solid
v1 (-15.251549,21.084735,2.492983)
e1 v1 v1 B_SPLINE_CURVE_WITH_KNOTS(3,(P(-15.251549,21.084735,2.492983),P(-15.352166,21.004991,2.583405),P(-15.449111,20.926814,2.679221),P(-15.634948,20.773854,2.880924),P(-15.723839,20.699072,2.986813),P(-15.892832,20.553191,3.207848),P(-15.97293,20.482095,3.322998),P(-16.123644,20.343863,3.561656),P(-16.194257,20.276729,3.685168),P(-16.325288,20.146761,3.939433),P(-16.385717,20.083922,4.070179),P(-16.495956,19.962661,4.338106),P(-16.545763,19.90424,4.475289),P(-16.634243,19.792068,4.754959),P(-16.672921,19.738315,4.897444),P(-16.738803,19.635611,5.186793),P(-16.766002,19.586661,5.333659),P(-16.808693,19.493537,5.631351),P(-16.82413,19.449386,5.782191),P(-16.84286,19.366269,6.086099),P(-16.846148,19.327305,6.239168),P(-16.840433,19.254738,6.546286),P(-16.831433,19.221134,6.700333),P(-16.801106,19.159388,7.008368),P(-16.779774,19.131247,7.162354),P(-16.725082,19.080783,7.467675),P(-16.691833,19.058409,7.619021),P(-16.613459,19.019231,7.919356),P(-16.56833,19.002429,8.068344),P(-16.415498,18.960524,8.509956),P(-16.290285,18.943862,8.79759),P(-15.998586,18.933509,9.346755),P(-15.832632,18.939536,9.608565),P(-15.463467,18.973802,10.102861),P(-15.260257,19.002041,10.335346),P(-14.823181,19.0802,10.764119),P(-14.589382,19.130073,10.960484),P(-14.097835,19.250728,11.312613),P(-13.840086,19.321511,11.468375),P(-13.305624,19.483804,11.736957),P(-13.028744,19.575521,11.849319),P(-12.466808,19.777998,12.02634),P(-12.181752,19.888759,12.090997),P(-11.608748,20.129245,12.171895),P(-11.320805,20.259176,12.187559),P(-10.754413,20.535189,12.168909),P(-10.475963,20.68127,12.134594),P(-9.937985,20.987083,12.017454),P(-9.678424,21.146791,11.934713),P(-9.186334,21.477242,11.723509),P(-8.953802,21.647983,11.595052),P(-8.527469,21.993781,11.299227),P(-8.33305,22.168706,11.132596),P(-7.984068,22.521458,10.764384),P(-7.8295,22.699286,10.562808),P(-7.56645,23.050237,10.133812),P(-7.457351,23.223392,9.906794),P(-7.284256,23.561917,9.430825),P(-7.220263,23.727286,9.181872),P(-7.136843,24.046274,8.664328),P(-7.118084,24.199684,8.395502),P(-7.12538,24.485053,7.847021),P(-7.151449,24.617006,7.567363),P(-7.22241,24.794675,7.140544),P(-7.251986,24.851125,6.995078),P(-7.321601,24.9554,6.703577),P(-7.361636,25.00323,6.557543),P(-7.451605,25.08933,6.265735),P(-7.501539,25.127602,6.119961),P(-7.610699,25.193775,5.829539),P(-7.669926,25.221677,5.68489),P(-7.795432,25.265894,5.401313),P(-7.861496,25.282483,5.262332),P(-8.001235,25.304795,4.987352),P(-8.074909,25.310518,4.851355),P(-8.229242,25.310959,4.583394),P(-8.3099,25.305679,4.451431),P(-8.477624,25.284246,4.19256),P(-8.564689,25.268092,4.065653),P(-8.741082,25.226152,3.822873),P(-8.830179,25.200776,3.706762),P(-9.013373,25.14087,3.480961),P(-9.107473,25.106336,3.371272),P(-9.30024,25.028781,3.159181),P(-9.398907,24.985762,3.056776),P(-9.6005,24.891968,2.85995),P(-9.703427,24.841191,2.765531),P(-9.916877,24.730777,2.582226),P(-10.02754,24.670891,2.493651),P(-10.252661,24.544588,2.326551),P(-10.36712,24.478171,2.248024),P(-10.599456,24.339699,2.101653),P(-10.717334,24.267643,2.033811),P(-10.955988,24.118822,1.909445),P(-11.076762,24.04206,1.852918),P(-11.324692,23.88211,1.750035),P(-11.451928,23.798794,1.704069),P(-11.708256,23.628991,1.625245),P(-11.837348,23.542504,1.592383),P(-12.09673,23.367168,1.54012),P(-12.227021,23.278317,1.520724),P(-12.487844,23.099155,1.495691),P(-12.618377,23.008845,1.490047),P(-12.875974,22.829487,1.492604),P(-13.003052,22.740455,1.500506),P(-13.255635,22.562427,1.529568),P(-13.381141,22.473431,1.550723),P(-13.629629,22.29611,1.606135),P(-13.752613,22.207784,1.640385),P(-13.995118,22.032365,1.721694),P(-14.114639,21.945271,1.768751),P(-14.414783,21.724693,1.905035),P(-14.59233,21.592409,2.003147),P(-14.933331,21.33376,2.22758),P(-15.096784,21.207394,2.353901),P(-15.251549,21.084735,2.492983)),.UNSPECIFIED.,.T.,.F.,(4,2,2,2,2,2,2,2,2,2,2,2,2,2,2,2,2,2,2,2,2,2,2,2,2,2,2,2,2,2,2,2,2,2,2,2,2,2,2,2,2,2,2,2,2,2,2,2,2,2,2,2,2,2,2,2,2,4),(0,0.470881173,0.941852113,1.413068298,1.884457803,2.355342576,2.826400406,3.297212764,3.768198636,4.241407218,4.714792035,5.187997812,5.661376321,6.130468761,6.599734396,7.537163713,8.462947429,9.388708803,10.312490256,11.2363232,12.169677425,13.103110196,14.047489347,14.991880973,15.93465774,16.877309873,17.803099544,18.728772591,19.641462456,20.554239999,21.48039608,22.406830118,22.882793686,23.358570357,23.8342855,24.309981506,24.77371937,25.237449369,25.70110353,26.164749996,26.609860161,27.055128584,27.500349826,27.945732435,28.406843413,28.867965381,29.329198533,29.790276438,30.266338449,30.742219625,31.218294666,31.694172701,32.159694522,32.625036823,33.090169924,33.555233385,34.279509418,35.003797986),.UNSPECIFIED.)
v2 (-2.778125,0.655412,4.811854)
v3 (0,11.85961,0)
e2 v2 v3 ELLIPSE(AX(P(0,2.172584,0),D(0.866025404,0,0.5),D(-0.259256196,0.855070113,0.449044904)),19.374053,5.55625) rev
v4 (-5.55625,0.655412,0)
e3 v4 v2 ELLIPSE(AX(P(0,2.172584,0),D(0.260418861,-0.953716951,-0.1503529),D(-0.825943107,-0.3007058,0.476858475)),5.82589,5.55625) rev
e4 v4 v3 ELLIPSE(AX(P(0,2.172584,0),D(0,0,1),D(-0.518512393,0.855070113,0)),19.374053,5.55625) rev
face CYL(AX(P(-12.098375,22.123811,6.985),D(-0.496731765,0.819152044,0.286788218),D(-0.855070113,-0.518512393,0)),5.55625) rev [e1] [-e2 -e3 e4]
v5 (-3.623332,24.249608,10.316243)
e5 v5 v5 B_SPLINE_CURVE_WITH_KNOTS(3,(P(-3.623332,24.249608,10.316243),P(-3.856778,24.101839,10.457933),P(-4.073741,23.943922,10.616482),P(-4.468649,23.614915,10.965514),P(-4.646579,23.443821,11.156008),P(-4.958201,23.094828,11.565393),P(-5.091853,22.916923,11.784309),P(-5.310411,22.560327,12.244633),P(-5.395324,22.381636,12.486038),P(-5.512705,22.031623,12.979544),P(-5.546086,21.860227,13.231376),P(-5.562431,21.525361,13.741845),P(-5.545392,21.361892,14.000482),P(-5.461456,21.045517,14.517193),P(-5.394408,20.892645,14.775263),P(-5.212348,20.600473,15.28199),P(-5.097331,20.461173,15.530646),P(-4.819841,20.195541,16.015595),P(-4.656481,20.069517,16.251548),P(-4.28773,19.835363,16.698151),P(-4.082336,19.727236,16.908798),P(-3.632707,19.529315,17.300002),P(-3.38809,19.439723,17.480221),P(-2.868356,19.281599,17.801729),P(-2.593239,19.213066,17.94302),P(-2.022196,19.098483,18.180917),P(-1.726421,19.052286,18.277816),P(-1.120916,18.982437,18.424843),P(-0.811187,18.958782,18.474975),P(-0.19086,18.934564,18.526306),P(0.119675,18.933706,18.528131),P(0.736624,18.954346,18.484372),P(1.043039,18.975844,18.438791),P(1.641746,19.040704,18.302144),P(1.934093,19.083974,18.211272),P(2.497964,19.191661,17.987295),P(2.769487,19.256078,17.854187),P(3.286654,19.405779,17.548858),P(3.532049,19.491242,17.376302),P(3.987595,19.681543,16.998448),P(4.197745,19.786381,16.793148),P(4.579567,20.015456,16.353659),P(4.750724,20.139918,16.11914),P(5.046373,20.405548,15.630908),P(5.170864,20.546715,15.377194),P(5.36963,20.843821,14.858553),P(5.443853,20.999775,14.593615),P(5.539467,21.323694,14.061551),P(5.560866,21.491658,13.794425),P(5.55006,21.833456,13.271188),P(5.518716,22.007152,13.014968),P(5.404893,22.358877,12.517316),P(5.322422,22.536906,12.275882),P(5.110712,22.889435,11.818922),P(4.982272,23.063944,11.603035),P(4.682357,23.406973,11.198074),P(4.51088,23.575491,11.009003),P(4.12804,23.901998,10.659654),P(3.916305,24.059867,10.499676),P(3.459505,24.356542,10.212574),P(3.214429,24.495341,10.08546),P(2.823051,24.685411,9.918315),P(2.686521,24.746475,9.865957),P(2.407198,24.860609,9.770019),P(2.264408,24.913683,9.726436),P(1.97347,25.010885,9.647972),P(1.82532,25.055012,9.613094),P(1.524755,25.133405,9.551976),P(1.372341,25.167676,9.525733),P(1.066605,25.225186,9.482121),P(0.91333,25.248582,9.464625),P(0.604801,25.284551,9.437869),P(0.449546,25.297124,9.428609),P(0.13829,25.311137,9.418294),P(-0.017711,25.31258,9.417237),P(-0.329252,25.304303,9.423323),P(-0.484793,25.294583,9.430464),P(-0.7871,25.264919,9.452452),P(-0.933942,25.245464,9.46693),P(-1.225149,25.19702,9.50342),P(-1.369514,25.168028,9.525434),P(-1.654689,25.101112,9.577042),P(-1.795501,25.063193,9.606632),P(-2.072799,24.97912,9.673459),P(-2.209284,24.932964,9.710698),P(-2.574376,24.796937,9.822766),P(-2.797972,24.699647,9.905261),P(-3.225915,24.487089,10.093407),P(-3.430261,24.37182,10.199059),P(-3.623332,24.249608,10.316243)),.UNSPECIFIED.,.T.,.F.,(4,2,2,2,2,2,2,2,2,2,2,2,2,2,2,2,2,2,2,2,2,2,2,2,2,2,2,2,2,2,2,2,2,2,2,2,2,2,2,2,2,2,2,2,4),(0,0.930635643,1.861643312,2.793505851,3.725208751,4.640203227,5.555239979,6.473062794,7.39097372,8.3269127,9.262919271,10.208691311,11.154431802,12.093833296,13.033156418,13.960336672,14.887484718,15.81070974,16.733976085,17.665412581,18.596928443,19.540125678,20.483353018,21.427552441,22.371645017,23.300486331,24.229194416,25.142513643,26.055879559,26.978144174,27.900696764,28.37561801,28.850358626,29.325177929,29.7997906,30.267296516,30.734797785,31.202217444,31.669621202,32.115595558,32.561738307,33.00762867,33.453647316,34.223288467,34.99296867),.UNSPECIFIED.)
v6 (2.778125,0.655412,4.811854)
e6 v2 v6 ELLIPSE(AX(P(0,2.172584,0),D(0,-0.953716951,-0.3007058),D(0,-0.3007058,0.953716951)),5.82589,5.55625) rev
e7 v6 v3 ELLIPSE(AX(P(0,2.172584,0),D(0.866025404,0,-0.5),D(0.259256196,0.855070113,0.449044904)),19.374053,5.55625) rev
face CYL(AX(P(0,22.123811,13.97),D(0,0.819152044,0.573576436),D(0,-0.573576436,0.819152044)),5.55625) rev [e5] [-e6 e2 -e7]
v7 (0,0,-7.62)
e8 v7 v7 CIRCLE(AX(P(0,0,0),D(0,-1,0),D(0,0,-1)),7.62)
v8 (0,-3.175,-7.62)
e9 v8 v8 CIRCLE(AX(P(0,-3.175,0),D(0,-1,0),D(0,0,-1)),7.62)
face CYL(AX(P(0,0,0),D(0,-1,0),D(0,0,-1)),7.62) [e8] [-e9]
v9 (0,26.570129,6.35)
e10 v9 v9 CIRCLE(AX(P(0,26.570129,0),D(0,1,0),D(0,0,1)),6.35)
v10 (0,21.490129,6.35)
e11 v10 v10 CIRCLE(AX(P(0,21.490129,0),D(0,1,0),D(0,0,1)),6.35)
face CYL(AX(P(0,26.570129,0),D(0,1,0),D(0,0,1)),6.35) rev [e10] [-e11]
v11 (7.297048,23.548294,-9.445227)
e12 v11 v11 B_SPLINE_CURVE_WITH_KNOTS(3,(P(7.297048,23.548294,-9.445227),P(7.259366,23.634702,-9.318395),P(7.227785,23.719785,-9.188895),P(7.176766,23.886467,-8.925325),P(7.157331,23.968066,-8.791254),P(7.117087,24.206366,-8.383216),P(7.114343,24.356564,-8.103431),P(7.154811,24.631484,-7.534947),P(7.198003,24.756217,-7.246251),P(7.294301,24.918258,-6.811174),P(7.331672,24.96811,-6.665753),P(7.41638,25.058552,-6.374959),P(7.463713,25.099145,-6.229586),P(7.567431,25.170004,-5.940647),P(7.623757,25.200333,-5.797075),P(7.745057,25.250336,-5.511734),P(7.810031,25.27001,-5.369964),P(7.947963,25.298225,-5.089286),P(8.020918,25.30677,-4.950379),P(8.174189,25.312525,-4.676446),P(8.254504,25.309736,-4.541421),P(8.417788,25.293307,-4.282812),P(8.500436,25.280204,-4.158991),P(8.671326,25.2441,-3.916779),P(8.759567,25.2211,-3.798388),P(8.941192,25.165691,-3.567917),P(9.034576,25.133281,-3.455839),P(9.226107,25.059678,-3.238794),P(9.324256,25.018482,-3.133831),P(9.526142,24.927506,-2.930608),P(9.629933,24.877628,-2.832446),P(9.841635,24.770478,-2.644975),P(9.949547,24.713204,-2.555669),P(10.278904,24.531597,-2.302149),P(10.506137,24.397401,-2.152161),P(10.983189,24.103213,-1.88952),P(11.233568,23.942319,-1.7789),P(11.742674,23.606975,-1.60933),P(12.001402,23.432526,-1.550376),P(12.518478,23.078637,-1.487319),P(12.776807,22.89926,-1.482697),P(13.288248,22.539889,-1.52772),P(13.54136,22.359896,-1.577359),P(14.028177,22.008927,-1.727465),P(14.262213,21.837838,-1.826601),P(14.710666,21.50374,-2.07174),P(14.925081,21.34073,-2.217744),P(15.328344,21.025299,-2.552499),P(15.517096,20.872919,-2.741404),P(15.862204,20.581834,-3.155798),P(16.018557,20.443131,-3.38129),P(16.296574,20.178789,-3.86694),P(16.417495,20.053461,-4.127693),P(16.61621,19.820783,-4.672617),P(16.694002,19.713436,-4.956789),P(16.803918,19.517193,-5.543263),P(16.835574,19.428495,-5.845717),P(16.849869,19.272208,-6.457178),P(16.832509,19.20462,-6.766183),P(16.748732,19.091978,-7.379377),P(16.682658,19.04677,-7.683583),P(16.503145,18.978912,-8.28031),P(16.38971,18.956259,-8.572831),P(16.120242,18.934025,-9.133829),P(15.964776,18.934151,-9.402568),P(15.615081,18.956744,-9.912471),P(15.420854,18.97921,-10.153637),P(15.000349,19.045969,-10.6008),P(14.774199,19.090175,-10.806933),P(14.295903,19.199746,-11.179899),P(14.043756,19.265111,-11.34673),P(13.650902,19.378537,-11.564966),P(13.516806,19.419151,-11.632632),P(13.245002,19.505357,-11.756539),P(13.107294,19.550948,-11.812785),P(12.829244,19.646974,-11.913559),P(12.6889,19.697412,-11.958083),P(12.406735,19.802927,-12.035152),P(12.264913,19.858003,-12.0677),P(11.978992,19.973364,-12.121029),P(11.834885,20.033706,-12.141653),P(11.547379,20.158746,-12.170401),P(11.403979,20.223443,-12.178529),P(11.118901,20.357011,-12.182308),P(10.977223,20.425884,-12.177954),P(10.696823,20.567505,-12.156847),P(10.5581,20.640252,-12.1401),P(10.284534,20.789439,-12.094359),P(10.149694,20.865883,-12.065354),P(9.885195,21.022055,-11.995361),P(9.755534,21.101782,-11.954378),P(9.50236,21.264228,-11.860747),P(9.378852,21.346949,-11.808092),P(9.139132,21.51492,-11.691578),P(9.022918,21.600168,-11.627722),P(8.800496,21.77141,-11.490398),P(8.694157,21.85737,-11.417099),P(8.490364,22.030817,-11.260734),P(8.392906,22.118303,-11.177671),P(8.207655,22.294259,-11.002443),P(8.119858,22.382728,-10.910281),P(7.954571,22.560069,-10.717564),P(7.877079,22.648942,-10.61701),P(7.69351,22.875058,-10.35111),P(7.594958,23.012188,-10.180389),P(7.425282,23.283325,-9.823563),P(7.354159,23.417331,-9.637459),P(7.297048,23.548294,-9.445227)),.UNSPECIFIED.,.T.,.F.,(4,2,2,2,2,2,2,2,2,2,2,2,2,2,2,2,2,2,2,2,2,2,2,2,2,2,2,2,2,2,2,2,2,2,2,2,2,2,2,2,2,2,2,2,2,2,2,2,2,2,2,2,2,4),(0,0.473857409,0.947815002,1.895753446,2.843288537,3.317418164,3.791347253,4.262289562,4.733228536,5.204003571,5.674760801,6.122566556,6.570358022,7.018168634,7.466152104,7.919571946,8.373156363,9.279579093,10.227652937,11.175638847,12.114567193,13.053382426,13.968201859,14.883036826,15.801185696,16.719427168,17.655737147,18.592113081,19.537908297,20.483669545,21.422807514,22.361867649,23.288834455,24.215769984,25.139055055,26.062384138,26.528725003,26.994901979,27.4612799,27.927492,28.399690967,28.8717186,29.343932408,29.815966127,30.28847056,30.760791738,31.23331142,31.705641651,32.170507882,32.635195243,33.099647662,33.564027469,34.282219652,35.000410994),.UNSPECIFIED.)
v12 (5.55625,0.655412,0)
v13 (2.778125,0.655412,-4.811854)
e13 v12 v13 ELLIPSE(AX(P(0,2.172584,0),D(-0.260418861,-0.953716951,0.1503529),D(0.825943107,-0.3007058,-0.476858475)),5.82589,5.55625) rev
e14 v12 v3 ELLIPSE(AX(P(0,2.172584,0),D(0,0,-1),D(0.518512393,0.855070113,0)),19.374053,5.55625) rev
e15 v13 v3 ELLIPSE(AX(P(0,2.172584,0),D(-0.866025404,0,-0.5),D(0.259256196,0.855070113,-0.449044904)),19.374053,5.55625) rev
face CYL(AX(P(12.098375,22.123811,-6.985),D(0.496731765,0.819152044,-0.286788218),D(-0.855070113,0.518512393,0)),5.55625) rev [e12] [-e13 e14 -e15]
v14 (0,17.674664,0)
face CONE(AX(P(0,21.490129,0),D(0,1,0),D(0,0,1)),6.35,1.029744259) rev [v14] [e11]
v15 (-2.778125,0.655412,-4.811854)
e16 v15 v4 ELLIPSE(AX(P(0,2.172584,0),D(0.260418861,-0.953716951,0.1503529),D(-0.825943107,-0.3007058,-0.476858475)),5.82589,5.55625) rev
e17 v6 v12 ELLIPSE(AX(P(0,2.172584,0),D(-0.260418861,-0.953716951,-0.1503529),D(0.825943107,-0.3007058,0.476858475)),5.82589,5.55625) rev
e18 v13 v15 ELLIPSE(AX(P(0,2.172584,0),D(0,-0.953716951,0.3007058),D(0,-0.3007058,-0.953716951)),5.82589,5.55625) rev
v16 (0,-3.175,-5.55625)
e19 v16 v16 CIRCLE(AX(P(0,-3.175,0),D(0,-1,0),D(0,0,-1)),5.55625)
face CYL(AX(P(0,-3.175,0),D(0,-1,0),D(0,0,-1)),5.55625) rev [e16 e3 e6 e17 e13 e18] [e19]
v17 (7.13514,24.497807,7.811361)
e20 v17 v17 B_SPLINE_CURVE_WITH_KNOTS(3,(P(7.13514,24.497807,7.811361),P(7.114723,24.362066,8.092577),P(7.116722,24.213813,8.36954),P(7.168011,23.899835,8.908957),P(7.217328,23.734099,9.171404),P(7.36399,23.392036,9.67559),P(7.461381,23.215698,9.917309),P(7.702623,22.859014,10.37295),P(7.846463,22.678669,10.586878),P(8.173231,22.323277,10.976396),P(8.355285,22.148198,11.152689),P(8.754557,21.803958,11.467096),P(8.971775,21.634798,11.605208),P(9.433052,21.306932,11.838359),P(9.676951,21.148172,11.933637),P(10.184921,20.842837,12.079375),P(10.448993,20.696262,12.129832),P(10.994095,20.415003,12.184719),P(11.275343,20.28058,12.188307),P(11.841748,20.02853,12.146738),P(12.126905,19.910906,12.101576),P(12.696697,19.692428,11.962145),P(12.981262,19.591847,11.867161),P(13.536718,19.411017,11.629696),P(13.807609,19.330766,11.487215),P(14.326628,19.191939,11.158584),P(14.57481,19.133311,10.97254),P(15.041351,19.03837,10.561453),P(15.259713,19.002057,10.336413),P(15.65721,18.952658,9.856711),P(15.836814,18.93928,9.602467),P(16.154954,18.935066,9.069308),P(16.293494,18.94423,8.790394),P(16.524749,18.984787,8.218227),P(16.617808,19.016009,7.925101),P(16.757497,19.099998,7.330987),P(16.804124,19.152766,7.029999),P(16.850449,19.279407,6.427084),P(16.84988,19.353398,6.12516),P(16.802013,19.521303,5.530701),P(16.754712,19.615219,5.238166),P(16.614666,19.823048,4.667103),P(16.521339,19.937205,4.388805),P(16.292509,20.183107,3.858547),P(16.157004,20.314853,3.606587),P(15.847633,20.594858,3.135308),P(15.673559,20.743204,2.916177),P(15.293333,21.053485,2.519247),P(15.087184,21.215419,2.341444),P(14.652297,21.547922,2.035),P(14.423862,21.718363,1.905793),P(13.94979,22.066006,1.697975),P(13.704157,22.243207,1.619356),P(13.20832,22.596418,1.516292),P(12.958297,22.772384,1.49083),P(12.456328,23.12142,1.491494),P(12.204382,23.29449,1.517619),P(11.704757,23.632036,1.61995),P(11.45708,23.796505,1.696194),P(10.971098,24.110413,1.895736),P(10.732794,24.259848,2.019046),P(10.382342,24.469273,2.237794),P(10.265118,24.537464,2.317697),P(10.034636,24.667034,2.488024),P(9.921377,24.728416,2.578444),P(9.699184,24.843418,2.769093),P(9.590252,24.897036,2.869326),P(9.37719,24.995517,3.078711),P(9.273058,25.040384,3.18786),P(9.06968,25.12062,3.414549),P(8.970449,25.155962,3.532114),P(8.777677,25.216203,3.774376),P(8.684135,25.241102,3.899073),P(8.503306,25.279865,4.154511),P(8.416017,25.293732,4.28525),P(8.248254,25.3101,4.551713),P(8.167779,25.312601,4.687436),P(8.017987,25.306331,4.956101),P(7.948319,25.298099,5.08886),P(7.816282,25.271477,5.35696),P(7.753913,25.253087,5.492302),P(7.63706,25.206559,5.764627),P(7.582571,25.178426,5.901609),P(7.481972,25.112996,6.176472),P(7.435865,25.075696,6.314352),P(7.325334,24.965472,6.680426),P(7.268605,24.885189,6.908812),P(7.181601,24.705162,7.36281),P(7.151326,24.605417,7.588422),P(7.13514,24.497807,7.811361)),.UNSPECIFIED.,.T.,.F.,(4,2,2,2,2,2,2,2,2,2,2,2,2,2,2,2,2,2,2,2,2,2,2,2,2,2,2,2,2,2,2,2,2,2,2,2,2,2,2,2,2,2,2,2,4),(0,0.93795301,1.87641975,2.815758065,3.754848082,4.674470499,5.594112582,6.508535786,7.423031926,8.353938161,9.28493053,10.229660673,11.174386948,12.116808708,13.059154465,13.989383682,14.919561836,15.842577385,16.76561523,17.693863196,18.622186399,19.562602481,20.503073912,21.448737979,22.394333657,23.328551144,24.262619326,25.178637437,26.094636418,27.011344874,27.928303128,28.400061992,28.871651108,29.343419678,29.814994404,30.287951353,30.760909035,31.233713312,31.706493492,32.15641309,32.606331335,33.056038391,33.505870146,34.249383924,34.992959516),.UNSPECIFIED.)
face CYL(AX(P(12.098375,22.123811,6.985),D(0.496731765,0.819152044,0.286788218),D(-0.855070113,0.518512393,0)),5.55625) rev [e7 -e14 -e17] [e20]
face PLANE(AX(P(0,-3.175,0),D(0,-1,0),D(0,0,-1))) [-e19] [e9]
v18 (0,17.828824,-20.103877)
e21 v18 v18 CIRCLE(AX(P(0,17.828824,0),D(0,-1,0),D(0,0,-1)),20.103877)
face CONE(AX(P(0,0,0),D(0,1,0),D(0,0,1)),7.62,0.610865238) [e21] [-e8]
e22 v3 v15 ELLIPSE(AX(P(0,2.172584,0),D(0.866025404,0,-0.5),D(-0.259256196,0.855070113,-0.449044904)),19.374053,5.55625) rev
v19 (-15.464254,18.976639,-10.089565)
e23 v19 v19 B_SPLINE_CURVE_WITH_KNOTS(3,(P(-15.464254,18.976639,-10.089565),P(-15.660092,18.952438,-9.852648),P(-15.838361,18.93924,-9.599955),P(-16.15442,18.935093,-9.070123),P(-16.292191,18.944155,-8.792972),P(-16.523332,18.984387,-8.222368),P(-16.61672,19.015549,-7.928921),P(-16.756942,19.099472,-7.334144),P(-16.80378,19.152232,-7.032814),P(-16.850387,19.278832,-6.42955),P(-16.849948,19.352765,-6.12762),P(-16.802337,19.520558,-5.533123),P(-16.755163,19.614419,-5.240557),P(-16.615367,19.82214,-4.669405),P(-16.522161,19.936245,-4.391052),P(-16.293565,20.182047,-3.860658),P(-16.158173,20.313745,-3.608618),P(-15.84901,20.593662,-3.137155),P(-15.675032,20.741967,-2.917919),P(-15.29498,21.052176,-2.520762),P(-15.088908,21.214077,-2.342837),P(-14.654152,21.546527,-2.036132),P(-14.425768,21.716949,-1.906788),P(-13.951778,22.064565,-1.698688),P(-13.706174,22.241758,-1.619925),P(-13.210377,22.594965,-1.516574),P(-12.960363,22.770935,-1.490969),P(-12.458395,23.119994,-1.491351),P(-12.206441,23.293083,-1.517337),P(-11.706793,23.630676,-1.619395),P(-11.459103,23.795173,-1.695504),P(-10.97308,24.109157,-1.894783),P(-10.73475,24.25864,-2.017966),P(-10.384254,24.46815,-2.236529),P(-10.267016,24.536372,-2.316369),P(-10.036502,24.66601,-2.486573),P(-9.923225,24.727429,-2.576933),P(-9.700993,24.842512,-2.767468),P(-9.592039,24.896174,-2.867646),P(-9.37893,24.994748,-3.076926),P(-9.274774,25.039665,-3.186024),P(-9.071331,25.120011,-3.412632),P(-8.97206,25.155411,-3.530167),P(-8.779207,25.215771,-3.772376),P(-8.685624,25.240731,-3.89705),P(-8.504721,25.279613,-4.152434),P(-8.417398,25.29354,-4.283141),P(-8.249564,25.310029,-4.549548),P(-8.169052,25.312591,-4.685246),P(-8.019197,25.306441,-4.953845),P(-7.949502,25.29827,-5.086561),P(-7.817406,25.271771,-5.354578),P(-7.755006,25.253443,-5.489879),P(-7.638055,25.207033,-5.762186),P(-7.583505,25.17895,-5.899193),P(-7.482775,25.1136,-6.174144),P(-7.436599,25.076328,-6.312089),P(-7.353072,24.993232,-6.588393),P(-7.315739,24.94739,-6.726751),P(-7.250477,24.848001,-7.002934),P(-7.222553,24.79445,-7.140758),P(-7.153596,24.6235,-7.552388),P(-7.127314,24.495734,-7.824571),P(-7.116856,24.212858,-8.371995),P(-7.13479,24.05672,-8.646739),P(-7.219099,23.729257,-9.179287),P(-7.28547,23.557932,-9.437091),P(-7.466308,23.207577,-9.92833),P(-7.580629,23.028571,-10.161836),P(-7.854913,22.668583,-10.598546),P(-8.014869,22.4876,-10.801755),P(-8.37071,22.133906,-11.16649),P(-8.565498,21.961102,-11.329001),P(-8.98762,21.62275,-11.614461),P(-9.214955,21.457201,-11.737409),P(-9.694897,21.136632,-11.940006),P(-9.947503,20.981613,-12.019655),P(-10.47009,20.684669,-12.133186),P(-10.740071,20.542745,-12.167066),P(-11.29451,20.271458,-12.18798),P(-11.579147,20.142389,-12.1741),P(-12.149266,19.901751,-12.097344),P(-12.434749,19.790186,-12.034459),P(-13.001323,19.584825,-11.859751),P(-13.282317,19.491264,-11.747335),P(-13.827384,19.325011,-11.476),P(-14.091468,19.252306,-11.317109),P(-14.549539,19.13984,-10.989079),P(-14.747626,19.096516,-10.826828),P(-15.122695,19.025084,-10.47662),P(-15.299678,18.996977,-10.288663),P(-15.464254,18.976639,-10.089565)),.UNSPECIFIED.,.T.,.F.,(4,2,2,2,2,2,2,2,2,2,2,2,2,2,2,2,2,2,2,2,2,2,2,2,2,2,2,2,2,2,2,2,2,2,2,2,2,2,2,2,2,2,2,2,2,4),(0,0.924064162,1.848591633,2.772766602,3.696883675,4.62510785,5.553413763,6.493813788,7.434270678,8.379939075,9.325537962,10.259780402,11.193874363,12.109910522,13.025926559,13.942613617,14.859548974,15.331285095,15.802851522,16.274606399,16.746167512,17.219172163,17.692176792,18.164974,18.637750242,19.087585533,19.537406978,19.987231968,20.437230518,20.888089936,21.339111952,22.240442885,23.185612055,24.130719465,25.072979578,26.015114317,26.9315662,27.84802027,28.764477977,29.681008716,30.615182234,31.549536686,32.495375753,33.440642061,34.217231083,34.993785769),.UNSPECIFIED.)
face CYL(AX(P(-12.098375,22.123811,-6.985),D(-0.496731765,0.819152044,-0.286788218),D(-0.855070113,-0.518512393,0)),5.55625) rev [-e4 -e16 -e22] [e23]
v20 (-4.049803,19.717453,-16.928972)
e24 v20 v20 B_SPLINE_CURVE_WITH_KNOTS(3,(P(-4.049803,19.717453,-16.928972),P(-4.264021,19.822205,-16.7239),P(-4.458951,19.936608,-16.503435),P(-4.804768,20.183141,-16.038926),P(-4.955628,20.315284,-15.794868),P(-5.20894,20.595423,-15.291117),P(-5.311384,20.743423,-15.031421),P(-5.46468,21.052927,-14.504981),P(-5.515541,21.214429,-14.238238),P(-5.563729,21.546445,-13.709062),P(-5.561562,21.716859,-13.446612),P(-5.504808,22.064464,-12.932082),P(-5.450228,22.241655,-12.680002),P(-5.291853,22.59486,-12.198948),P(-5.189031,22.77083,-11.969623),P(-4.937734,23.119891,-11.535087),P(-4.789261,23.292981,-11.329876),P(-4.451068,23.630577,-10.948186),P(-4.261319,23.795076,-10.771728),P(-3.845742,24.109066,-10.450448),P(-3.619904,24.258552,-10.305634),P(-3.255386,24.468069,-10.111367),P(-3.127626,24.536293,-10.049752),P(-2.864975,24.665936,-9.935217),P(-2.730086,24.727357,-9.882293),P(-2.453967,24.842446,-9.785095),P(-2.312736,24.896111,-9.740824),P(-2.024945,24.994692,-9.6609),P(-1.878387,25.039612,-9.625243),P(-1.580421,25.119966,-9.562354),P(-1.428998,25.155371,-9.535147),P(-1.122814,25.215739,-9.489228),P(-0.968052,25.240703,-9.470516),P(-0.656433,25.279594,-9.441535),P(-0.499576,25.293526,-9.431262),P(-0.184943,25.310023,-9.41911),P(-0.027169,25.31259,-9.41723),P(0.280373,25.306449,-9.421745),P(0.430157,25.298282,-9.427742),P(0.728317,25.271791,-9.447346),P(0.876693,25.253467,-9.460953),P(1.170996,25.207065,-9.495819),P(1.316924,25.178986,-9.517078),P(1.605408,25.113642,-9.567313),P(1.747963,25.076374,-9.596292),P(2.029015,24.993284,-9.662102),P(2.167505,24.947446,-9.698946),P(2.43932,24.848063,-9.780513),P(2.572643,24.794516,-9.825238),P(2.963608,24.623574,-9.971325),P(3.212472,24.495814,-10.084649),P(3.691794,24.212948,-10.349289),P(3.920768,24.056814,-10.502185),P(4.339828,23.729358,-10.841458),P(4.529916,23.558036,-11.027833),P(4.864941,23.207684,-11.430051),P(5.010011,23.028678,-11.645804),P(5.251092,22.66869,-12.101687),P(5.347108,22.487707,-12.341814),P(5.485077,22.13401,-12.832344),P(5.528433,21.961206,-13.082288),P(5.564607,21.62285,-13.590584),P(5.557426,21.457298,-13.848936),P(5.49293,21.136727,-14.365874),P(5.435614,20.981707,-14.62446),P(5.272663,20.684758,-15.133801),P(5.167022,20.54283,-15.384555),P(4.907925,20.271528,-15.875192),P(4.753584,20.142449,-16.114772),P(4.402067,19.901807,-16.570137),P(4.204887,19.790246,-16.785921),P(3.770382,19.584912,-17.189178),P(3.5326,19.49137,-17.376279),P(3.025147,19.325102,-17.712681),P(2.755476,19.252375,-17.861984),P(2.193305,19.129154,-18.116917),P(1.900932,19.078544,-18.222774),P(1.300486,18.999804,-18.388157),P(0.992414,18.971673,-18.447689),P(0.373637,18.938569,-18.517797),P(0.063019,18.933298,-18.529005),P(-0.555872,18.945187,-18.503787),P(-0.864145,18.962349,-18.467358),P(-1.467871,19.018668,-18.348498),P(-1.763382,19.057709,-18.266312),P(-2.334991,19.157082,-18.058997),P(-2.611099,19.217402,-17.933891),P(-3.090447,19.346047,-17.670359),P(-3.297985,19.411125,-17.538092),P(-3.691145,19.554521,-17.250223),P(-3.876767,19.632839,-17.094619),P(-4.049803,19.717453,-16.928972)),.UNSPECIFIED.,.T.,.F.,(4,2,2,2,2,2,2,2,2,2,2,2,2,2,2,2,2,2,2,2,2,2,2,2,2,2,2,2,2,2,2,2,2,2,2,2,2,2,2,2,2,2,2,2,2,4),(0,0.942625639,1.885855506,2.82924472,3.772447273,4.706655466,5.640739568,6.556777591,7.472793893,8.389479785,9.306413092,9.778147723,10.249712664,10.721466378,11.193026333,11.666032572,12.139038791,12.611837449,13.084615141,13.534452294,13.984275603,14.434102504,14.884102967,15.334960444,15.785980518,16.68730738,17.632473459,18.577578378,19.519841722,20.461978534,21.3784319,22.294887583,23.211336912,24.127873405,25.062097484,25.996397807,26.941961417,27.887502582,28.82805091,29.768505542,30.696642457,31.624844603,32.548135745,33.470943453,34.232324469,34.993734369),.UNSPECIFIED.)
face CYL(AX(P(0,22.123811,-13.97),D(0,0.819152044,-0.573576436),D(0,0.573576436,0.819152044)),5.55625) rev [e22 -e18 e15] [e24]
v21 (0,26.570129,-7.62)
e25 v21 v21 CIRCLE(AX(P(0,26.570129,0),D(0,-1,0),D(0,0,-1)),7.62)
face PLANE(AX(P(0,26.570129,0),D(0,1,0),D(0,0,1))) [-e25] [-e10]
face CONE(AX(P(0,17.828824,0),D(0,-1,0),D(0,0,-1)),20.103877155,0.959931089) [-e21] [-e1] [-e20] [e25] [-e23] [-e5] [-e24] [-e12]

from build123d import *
from OCP.BRepAlgoAPI import BRepAlgoAPI_Cut
from OCP.TopTools import TopTools_ListOfShape

# Parameters (mm, degrees)
F_7_16_0_4375_DIAMETER_HOLE4_D     = 11.1125
F_7_16_0_4375_DIAMETER_HOLE4_DEPTH = 6.35
F_7_16_0_4375_DIAMETER_HOLE4_TIP   = 3.338531814
CIRPATTERN3_COUNT                  = 6
F_1_2_0_5_DIAMETER_HOLE1_D         = 12.7
F_1_2_0_5_DIAMETER_HOLE1_DEPTH     = 5.08
F_1_2_0_5_DIAMETER_HOLE1_TIP       = 3.815464931


with BuildPart() as part:
    # Sketch1 → Revolve1 (revolve)
    with BuildSketch(Plane.XY):
        Polygon((0, 0), (0, 26.570129165), (7.62, 26.570129165), (20.103877155, 17.828824275), (7.62, 0), (7.62, -3.175), (0, -3.175), align=None)
    revolve(axis=Axis((0, 0, 0), (0, 1, 0)))

    # 7/16 (0.4375) Diameter Hole4
    with Locations(Plane(origin=(0.774073223, -3.175, 1.453774394), x_dir=(-1, 0, 0), z_dir=(0, -1, 0))):
        with Locations((0.774073223, 1.453774394)):
            Hole(F_7_16_0_4375_DIAMETER_HOLE4_D / 2, depth=F_7_16_0_4375_DIAMETER_HOLE4_DEPTH)
            with Locations((0, 0, -(F_7_16_0_4375_DIAMETER_HOLE4_DEPTH + F_7_16_0_4375_DIAMETER_HOLE4_TIP / 2))):  # 118° drill point
                Cone(0, F_7_16_0_4375_DIAMETER_HOLE4_D / 2, F_7_16_0_4375_DIAMETER_HOLE4_TIP, mode=Mode.SUBTRACT)


with BuildPart() as f_7_16_0_4375_diameter_hole5_tool:
    # Sketch14 → 7/16 (0.4375) Diameter Hole5 (revolve)
    with BuildSketch(Plane(origin=(0, 22.123811298, -13.97), x_dir=(0, 0.5735764363510476, 0.8191520442889908), z_dir=(1, 0, 0))):
        Polygon((0, 0), (0, 28.738531814), (5.55625, 25.4), (5.55625, 0), align=None)
    f_7_16_0_4375_diameter_hole5 = revolve(axis=Axis((0, 27.325426779, -17.612210371), (0, -0.8191520442889908, 0.5735764363510476)))


with BuildPart() as part_1:
    add(part.part)

    # 7/16 (0.4375) Diameter Hole5: cut by f_7_16_0_4375_diameter_hole5_tool, with a tolerance
    f_7_16_0_4375_diameter_hole5_stock = TopTools_ListOfShape()
    f_7_16_0_4375_diameter_hole5_stock.Append(part_1.part.wrapped)
    f_7_16_0_4375_diameter_hole5_tools = TopTools_ListOfShape()
    f_7_16_0_4375_diameter_hole5_tools.Append(f_7_16_0_4375_diameter_hole5_tool.part.wrapped)
    f_7_16_0_4375_diameter_hole5_cut = BRepAlgoAPI_Cut()
    f_7_16_0_4375_diameter_hole5_cut.SetArguments(f_7_16_0_4375_diameter_hole5_stock)
    f_7_16_0_4375_diameter_hole5_cut.SetTools(f_7_16_0_4375_diameter_hole5_tools)
    f_7_16_0_4375_diameter_hole5_cut.SetFuzzyValue(0.00001)
    f_7_16_0_4375_diameter_hole5_cut.Build()
    add(Compound.cast(f_7_16_0_4375_diameter_hole5_cut.Shape()).solids(), mode=Mode.REPLACE)

    # CirPattern3: 7/16 (0.4375) Diameter Hole5 ×6 about axis
    cirpattern3_axis = Axis((0, 26.570129165, 0), (0, -1, 0))
    for i in range(1, CIRPATTERN3_COUNT):
        add(f_7_16_0_4375_diameter_hole5.rotate(cirpattern3_axis, i * 360 / CIRPATTERN3_COUNT), mode=Mode.SUBTRACT)

    # 1/2 (0.5) Diameter Hole1
    with Locations(Plane(origin=(0, 26.570129165, 0), x_dir=(1, 0, 0), z_dir=(0, 1, 0))):
        with Locations((0, 0)):
            Hole(F_1_2_0_5_DIAMETER_HOLE1_D / 2, depth=F_1_2_0_5_DIAMETER_HOLE1_DEPTH)
            with Locations((0, 0, -(F_1_2_0_5_DIAMETER_HOLE1_DEPTH + F_1_2_0_5_DIAMETER_HOLE1_TIP / 2))):  # 118° drill point
                Cone(0, F_1_2_0_5_DIAMETER_HOLE1_D / 2, F_1_2_0_5_DIAMETER_HOLE1_TIP, mode=Mode.SUBTRACT)


solid = part_1.part
